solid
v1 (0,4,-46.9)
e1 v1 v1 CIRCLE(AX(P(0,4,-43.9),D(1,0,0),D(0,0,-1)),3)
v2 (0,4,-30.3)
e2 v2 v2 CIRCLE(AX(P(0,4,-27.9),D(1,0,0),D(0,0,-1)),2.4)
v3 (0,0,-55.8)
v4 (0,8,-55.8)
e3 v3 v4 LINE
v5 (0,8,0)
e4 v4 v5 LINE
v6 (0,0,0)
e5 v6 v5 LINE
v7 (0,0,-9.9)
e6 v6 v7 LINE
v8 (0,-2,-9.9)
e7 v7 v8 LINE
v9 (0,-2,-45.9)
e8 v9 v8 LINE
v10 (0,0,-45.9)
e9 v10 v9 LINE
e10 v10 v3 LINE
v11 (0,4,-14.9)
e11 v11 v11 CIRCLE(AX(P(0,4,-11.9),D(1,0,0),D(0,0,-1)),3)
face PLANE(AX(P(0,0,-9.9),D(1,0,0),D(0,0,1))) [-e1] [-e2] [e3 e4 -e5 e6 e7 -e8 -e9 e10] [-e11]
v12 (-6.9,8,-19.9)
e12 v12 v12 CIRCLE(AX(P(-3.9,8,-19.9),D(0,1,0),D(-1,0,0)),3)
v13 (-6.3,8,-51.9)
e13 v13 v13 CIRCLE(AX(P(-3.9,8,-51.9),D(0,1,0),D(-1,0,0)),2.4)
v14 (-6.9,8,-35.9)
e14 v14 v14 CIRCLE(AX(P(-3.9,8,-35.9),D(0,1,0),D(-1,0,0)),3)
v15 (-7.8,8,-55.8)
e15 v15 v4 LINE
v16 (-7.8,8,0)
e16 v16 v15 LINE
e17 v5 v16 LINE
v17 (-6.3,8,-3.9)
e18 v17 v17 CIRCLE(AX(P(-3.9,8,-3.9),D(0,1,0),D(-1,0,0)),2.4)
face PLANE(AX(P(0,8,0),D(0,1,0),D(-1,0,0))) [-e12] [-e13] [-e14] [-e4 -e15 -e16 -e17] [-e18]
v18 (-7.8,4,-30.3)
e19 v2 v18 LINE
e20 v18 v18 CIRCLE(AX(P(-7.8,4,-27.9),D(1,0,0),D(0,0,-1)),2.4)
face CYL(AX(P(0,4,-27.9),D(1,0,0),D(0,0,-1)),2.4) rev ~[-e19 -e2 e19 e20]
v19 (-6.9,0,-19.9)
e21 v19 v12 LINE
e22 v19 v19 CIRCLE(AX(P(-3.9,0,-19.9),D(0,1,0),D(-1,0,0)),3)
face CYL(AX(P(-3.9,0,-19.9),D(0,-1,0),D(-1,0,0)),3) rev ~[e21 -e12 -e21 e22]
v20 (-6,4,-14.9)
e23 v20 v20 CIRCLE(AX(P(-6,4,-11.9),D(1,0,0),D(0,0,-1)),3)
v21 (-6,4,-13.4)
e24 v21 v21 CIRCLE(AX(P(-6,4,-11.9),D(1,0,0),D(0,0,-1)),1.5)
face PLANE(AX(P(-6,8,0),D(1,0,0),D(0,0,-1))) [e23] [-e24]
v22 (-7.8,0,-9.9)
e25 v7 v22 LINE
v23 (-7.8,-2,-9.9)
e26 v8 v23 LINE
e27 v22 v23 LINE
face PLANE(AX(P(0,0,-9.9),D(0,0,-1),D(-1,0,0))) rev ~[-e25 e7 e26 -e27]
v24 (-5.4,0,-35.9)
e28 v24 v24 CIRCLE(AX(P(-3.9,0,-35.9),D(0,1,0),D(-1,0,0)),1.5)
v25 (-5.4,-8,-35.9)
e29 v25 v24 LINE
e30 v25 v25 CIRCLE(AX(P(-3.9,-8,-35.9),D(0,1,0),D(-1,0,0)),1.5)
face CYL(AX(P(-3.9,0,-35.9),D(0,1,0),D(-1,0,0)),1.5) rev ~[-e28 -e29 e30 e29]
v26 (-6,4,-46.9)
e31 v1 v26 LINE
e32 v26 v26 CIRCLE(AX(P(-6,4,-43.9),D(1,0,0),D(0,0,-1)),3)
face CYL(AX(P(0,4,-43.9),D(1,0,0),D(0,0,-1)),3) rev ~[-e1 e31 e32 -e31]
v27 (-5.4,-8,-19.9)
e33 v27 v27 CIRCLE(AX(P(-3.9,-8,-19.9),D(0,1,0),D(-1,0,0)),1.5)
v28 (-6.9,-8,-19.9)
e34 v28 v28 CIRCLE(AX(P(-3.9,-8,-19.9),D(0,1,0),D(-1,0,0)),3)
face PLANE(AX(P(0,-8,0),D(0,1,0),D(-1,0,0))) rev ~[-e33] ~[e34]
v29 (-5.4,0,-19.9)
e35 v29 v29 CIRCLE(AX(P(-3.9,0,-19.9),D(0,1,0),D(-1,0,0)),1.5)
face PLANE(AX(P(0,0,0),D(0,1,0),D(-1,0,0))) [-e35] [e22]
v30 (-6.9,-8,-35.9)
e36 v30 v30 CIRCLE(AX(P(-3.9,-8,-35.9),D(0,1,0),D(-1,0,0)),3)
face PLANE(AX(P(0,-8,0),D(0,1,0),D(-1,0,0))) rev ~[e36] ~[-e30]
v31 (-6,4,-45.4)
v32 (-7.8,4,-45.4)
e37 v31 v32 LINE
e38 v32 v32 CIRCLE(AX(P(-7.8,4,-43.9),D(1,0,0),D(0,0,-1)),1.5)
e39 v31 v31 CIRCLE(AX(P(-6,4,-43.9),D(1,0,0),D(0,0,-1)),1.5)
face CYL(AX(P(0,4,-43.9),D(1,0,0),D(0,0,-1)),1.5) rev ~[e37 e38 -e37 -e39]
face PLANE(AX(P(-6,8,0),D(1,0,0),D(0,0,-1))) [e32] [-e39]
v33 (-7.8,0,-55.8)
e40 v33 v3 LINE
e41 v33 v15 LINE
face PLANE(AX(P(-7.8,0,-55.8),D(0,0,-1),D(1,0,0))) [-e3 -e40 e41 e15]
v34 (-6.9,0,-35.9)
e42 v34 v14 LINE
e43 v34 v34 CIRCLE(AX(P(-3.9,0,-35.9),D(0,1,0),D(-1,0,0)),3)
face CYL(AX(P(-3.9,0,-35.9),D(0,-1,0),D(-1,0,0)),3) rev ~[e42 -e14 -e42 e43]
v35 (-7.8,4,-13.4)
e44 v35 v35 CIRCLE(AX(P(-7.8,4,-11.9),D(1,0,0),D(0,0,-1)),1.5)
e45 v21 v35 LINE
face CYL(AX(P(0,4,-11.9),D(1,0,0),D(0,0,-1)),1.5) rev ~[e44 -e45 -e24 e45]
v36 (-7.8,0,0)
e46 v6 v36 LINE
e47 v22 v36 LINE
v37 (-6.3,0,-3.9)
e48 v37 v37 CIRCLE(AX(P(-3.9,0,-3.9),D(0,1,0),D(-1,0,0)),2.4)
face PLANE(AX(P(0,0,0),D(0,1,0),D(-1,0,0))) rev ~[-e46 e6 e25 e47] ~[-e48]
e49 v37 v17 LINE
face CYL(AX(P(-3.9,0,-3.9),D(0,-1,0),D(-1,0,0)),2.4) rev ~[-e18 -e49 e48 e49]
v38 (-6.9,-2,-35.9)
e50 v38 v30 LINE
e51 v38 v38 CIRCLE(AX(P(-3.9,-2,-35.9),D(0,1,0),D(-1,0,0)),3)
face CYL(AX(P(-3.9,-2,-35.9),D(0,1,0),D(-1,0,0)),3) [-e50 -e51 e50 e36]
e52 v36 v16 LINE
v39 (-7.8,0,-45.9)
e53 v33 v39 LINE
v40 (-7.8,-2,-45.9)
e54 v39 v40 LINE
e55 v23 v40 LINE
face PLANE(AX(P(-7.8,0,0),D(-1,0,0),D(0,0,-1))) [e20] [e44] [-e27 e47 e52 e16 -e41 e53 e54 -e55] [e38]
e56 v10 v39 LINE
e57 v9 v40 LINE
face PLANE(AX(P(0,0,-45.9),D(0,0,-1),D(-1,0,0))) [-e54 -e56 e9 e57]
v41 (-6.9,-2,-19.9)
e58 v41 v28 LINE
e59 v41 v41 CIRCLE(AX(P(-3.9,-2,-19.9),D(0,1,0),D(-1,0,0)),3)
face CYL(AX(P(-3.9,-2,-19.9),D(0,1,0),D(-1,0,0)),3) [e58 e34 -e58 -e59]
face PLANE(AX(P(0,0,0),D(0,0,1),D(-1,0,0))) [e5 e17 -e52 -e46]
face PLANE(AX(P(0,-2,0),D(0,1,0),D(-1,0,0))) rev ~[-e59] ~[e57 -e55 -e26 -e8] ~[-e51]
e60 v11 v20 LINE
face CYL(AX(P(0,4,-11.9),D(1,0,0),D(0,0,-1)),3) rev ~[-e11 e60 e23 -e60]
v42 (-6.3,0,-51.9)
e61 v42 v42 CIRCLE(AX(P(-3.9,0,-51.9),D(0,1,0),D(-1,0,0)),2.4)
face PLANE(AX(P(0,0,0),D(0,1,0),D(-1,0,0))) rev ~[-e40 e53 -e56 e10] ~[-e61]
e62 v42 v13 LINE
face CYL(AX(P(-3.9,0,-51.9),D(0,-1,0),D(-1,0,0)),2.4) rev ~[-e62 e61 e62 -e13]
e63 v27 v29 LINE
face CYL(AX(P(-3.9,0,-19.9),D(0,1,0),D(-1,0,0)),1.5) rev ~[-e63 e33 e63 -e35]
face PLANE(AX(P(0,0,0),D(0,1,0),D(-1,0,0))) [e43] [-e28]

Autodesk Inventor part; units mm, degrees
ref_plane "YZ Plane" through (0, 0, 0) normal (1, 0, 0) x (0, 1, 0)
ref_plane "XZ Plane" through (0, 0, 0) normal (0, 1, 0) x (-1, 0, 0)
ref_plane "XY Plane" through (0, 0, 0) normal (0, 0, 1) x (1, 0, 0)
sketch "Sketch1" plane through (0, 0, 0) normal (0, 1, 0) x (-1, 0, 0)
  line L0 (0, 0) -> (7.8, 0)
  line L1 (7.8, 0) -> (7.8, -55.8)
  line L2 (7.8, -55.8) -> (0, -55.8)
  line L3 (0, -55.8) -> (0, 0)
  line L4 (3.9, 0) -> (3.9, -55.8) construction
  line L5 (7.8, -27.9) -> (0, -27.9) construction
  circle A0 centre (3.9, -19.9) radius 3
  circle A1 centre (3.9, -19.9) radius 1.5
  circle A2 centre (3.9, -35.9) radius 3
  circle A3 centre (3.9, -35.9) radius 1.5
  circle A4 centre (3.9, -3.9) radius 2.4
  circle A5 centre (3.9, -51.9) radius 2.4
  line L6 (0, -9.9) -> (7.8, -9.9)
  line L7 (0, -45.9) -> (7.8, -45.9)
  dimension "d0" = 7.8
  dimension "d1" = 55.8
  dimension "d3" = 6
  dimension "d4" = 3
  dimension "d25" = 8
  dimension "d26" = 4.8
  dimension "d27" = 16
  dimension "d28" = 18
extrude "Extrusion1" add sketch "Sketch1" along normal blind 8 contours L0 L1 L6 L3 | L6 L1 L7 L3 | L7 L1 L2 L3
extrude "Extrusion2" add sketch "Sketch1" against normal blind 2 contours L6 L1 L7 L3 | A0 | A2
extrude "Extrusion3" add sketch "Sketch1" against normal blind 6 from surface at -2 contours A0 | A2
sketch "Sketch2" plane through (0, 8, 0) normal (1, 0, 0) x (0, 0, -1)
  line L0 (0, 0) -> (55.8, 0) construction
  line L1 (0, -8) -> (0, 0) construction
  line L2 (45.9, -10) -> (9.9, -10) construction
  line L3 (55.8, 0) -> (55.8, -10) construction
  line L4 (27.9, 0) -> (27.9, -10) construction
  line L5 (9.9, -10) -> (45.9, -10) construction
  circle A0 centre (27.9, -4) radius 2.4
  line L6 (55.8, 0) -> (0, 0) projected
  line L7 (11.9, 0) -> (11.9, -10) construction
  circle A1 centre (11.9, -4) radius 1.5
  circle A2 centre (11.9, -4) radius 3
  circle A3 centre (43.9, -4) radius 1.5
  circle A4 centre (43.9, -4) radius 3
  point P0 (0, -10)
  dimension "d11" = 4
  dimension "d12" = 4.8
  dimension "d17" = 4
  dimension "d18" = 3
  dimension "d19" = 6
  dimension "d22" = 16
extrude "Extrusion4" cut sketch "Sketch2" against normal through all contours A0
extrude "Extrusion5" cut sketch "Sketch2" against normal blind 6 contours A1 | A2 | A3 | A4
extrude "Extrusion6" cut sketch "Sketch2" against normal through all contours A1 | A3
properties part number "diff_gear_holder_4"
